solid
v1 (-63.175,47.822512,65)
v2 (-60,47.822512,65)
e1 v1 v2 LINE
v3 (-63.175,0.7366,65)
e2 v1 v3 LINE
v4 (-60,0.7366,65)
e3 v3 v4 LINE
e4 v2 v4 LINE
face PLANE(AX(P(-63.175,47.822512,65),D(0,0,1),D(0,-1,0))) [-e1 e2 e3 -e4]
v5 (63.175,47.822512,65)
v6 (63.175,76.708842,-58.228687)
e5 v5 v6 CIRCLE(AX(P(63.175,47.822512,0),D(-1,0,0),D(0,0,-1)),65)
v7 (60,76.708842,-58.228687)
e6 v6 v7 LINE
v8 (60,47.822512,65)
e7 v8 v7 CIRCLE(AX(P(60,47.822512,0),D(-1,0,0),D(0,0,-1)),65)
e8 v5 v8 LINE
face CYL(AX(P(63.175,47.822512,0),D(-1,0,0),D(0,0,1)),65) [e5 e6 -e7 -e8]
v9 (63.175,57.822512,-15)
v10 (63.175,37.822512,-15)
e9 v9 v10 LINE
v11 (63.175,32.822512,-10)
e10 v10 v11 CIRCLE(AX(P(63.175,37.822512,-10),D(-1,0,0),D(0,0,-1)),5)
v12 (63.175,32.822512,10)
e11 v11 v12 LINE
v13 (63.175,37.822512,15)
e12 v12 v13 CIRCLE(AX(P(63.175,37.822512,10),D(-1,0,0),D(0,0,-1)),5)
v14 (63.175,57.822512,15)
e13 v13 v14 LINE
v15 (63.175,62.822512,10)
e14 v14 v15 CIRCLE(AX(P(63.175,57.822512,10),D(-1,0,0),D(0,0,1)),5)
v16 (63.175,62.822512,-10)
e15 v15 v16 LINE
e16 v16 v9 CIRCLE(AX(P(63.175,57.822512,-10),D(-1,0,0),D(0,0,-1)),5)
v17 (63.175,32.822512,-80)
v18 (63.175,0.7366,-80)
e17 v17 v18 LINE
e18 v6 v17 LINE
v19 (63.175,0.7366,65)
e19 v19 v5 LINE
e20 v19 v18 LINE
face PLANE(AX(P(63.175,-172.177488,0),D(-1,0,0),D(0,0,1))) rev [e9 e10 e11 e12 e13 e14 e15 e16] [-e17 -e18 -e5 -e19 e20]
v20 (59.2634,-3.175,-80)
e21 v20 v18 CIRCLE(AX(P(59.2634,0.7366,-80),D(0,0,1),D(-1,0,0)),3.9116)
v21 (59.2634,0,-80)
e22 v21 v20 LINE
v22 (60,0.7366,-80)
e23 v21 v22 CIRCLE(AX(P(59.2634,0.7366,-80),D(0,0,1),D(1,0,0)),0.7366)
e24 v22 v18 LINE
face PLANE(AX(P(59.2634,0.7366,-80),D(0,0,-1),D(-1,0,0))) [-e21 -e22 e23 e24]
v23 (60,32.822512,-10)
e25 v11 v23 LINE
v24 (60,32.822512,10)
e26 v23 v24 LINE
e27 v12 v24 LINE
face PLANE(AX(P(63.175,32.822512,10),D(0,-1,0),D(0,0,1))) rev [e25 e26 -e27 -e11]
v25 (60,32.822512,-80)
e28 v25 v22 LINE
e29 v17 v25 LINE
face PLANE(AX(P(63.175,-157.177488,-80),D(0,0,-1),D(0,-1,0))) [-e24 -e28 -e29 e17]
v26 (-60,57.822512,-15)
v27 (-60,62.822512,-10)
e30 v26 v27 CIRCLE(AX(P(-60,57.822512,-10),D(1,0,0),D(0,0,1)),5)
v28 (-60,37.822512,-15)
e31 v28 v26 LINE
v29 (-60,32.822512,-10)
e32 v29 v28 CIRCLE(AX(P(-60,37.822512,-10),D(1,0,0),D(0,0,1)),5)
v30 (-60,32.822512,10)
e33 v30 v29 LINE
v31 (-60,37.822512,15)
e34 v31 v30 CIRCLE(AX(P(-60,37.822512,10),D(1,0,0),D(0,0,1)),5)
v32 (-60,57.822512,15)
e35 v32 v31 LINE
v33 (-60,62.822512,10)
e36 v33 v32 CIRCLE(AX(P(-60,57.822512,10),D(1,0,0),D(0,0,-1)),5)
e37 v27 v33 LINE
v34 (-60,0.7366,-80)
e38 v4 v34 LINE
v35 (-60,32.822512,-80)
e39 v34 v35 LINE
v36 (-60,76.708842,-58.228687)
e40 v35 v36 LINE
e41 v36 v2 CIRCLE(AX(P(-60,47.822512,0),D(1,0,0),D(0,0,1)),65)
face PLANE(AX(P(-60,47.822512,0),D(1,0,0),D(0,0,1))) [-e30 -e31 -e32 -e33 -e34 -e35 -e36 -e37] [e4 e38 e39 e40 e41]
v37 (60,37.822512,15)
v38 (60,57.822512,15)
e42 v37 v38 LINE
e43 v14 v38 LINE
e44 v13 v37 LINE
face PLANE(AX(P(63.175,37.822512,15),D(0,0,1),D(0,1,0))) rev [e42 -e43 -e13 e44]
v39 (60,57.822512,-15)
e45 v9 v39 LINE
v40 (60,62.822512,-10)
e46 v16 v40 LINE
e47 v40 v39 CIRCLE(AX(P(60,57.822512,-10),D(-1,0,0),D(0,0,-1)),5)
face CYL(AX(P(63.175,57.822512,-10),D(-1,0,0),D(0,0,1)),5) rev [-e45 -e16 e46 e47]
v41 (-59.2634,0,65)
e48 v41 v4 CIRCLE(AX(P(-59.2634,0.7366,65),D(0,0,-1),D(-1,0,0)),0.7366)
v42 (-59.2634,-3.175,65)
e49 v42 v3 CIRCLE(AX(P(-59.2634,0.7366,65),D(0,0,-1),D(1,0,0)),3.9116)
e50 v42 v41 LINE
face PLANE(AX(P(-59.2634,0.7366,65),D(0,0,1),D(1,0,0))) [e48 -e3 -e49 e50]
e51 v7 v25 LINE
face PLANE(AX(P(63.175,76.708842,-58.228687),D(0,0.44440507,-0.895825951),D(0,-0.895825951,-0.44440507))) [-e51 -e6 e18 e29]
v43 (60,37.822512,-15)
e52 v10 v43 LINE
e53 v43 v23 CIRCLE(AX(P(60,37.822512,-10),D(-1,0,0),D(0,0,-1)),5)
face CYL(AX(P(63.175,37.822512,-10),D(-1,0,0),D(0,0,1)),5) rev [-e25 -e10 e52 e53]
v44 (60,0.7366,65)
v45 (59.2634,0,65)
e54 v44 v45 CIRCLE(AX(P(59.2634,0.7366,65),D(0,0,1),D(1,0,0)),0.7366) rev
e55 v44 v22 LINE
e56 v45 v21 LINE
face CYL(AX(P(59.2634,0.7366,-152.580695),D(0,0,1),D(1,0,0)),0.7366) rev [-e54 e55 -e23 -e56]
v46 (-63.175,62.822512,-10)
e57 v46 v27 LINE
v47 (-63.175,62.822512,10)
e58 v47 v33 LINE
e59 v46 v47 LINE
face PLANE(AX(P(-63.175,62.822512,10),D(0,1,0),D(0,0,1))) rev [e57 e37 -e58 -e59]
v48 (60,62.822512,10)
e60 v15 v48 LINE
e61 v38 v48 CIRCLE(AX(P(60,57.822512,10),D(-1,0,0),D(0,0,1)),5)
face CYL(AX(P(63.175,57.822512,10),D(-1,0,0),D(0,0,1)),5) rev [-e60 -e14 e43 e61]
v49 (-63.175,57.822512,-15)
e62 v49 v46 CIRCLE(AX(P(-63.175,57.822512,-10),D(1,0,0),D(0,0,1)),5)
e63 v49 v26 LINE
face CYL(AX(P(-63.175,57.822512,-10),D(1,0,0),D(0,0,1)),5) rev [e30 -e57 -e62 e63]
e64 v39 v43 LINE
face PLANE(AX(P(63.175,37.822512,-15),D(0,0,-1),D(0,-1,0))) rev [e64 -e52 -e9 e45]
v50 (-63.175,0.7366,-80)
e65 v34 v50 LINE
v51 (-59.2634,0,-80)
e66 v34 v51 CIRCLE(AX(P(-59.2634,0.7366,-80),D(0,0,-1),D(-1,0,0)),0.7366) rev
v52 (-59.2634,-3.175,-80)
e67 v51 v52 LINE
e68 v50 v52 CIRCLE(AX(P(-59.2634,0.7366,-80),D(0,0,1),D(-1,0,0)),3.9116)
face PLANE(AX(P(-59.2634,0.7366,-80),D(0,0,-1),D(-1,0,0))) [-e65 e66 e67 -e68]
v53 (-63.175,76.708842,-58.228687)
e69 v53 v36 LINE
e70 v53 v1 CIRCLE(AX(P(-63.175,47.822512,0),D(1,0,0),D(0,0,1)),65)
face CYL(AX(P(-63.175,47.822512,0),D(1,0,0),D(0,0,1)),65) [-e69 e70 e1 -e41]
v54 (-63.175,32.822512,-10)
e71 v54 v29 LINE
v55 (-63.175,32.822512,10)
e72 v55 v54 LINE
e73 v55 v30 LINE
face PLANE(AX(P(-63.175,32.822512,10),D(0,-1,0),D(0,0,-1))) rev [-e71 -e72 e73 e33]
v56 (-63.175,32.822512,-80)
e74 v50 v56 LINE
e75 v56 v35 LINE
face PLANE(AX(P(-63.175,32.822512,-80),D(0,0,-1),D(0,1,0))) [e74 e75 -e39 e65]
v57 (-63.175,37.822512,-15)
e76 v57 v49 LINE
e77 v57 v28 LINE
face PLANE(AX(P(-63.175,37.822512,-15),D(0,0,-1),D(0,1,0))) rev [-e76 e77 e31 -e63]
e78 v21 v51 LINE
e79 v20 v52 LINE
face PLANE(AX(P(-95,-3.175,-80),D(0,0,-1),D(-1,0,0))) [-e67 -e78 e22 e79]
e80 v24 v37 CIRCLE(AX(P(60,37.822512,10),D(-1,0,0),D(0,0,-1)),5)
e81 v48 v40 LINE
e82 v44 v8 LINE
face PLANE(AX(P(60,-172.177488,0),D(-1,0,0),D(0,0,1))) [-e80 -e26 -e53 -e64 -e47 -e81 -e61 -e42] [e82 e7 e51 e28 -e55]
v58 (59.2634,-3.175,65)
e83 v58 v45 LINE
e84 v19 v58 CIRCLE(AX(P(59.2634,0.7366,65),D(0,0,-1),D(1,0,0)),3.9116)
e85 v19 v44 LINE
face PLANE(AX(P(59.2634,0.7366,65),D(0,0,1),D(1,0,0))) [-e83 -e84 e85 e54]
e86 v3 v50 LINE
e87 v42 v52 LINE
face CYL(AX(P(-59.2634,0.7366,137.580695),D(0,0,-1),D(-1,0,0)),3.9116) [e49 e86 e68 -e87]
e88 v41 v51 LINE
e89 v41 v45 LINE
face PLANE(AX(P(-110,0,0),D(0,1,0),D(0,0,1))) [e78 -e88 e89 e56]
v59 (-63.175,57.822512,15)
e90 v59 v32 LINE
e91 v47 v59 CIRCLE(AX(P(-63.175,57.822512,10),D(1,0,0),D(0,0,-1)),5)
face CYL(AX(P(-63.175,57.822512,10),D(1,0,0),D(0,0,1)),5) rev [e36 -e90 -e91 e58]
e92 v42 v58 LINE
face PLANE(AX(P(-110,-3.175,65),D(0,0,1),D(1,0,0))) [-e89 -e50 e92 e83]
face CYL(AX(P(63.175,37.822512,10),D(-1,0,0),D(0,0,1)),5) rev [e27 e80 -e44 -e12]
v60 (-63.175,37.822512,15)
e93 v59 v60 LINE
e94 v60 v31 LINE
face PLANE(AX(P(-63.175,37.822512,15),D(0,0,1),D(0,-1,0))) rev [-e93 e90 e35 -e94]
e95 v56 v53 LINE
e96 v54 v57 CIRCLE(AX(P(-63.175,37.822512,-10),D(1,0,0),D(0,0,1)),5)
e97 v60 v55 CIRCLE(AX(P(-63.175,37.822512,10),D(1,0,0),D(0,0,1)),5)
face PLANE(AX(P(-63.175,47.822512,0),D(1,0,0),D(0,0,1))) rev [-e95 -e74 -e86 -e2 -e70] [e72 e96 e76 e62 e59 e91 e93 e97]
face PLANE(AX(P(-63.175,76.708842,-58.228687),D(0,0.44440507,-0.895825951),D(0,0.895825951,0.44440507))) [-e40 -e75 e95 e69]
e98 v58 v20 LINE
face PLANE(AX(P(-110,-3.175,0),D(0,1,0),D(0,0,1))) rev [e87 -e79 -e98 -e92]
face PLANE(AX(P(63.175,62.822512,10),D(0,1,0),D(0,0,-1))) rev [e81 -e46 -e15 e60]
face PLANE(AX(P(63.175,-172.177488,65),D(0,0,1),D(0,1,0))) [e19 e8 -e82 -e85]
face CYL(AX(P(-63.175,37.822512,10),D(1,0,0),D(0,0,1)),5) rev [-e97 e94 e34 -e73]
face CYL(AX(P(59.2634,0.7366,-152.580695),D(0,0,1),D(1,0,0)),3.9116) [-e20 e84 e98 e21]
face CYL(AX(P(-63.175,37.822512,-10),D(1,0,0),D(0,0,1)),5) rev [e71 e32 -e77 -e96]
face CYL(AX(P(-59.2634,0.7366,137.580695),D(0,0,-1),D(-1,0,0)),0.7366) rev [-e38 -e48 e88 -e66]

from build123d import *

# Parameters (mm, degrees)
BASE_FLANGE2_DEPTH         = 3.175
SKETCHED_START             = -176
SKETCHED_BEND3_OUTLINE_W   = 3.175
SKETCHED_BEND3_OUTLINE_H   = 145
SKETCHED_BEND3_DEPTH       = 112.825
SKETCHED_START_2           = 63.175
SKETCHED_BEND3_2_OUTLINE_W = 3.175
SKETCHED_BEND3_2_OUTLINE_H = 145
SKETCHED_BEND3_2_DEPTH     = 112.825
SKETCHED_START_3           = -62.794557784
SKETCHED_BEND3_3_DEPTH     = 2.794557784
SKETCHED_START_4           = 60
SKETCHED_BEND3_4_DEPTH     = 2.794557784
SKETCHED_START_5           = -63.175
SKETCHED_BEND3_5_DEPTH     = 3.9116
SKETCHED_START_6           = 59.2634
SKETCHED_BEND3_6_DEPTH     = 3.9116
SKETCHED_START_7           = -81
SKETCHED_BEND3_7_DEPTH     = 147


with BuildPart() as part:
    # Base-Flange2: sheet metal written as solids
    # Sketch1 → Base-Flange2 (new body)
    with BuildSketch(Plane(origin=(0, 0, 0), x_dir=(1, 0, 0), z_dir=(0, 1, 0))):
        with BuildLine():
            Line((-95, 80), (95, 80))
            Line((95, 80), (138.886329547, 58.22868679))
            ThreePointArc((138.886329547, 58.22868679), (173.284534609, -14.834678268), (110, -65))
            Line((110, -65), (-110, -65))
            ThreePointArc((-110, -65), (-173.284534609, -14.834678268), (-138.886329547, 58.22868679))
            Line((-138.886329547, 58.22868679), (-95, 80))
        make_face()
        with BuildLine():
            Line((100, -15), (120, -15))
            ThreePointArc((120, -15), (123.535533906, -13.535533906), (125, -10))
            Line((125, -10), (125, 10))
            ThreePointArc((125, 10), (123.535533906, 13.535533906), (120, 15))
            Line((120, 15), (100, 15))
            ThreePointArc((100, 15), (96.464466094, 13.535533906), (95, 10))
            Line((95, 10), (95, -10))
            ThreePointArc((95, -10), (96.464466094, -13.535533906), (100, -15))
        make_face(mode=Mode.SUBTRACT)
        with BuildLine():
            Line((-100, -15), (-120, -15))
            ThreePointArc((-120, -15), (-123.535533906, -13.535533906), (-125, -10))
            Line((-125, -10), (-125, 10))
            ThreePointArc((-125, 10), (-123.535533906, 13.535533906), (-120, 15))
            Line((-120, 15), (-100, 15))
            ThreePointArc((-100, 15), (-96.464466094, 13.535533906), (-95, 10))
            Line((-95, 10), (-95, -10))
            ThreePointArc((-95, -10), (-96.464466094, -13.535533906), (-100, -15))
        make_face(mode=Mode.SUBTRACT)
    extrude(amount=-BASE_FLANGE2_DEPTH)

    # Sketched Bend3: read off the stored shape, not the designer's step
    # Sketched Bend3 outline → Sketched Bend3 (cut)
    with BuildSketch(Plane.YZ.offset(SKETCHED_START)):
        with Locations((-1.5875, -7.5)):
            Rectangle(SKETCHED_BEND3_OUTLINE_W, SKETCHED_BEND3_OUTLINE_H)
    extrude(amount=SKETCHED_BEND3_DEPTH, mode=Mode.SUBTRACT)

    # Sketched Bend3 2 outline → Sketched Bend3 2 (cut)
    with BuildSketch(Plane.YZ.offset(SKETCHED_START_2)):
        with Locations((-1.5875, -7.5)):
            Rectangle(SKETCHED_BEND3_2_OUTLINE_W, SKETCHED_BEND3_2_OUTLINE_H)
    extrude(amount=SKETCHED_BEND3_2_DEPTH, mode=Mode.SUBTRACT)

    # Sketched Bend3 3 outline → Sketched Bend3 3 (add)
    with BuildSketch(Plane.YZ.offset(SKETCHED_START_3)):
        with BuildLine():
            Line((47.822512257, 65), (0, 65))
            Line((0, 65), (0, -80))
            Line((0, -80), (32.822512257, -80))
            Line((32.822512257, -80), (76.708841804, -58.22868679))
            ThreePointArc((76.708841804, -58.22868679), (111.107046866, 14.834678268), (47.822512257, 65))
        make_face()
        with BuildLine():
            ThreePointArc((62.822512257, -10), (61.358046163, -13.535533906), (57.822512257, -15))
            Line((57.822512257, -15), (37.822512257, -15))
            ThreePointArc((37.822512257, -15), (34.286978351, -13.535533906), (32.822512257, -10))
            Line((32.822512257, -10), (32.822512257, 10))
            ThreePointArc((32.822512257, 10), (34.286978351, 13.535533906), (37.822512257, 15))
            Line((37.822512257, 15), (57.822512257, 15))
            ThreePointArc((57.822512257, 15), (61.358046163, 13.535533906), (62.822512257, 10))
            Line((62.822512257, 10), (62.822512257, -10))
        make_face(mode=Mode.SUBTRACT)
    extrude(amount=SKETCHED_BEND3_3_DEPTH)

    # Sketched Bend3 4 outline → Sketched Bend3 4 (add)
    with BuildSketch(Plane.YZ.offset(SKETCHED_START_4)):
        with BuildLine():
            Line((47.822512257, 65), (0, 65))
            Line((0, 65), (0, -80))
            Line((0, -80), (32.822512257, -80))
            Line((32.822512257, -80), (76.708841804, -58.22868679))
            ThreePointArc((76.708841804, -58.22868679), (111.107046866, 14.834678268), (47.822512257, 65))
        make_face()
        with BuildLine():
            ThreePointArc((62.822512257, -10), (61.358046163, -13.535533906), (57.822512257, -15))
            Line((57.822512257, -15), (37.822512257, -15))
            ThreePointArc((37.822512257, -15), (34.286978351, -13.535533906), (32.822512257, -10))
            Line((32.822512257, -10), (32.822512257, 10))
            ThreePointArc((32.822512257, 10), (34.286978351, 13.535533906), (37.822512257, 15))
            Line((37.822512257, 15), (57.822512257, 15))
            ThreePointArc((57.822512257, 15), (61.358046163, 13.535533906), (62.822512257, 10))
            Line((62.822512257, 10), (62.822512257, -10))
        make_face(mode=Mode.SUBTRACT)
    extrude(amount=SKETCHED_BEND3_4_DEPTH)

    # Sketched Bend3 5 outline → Sketched Bend3 5 (add)
    with BuildSketch(Plane.YZ.offset(SKETCHED_START_5)):
        with BuildLine():
            ThreePointArc((76.708841804, -58.22868679), (111.107046866, 14.834678268), (47.822512257, 65))
            Line((47.822512257, 65), (0, 65))
            Line((0, 65), (0, -80))
            Line((0, -80), (32.822512257, -80))
            Line((32.822512257, -80), (76.708841804, -58.22868679))
        make_face()
        with BuildLine():
            ThreePointArc((62.822512257, -10), (61.358046163, -13.535533906), (57.822512257, -15))
            Line((57.822512257, -15), (37.822512257, -15))
            ThreePointArc((37.822512257, -15), (34.286978351, -13.535533906), (32.822512257, -10))
            Line((32.822512257, -10), (32.822512257, 10))
            ThreePointArc((32.822512257, 10), (34.286978351, 13.535533906), (37.822512257, 15))
            Line((37.822512257, 15), (57.822512257, 15))
            ThreePointArc((57.822512257, 15), (61.358046163, 13.535533906), (62.822512257, 10))
            Line((62.822512257, 10), (62.822512257, -10))
        make_face(mode=Mode.SUBTRACT)
    extrude(amount=SKETCHED_BEND3_5_DEPTH)

    # Sketched Bend3 6 outline → Sketched Bend3 6 (add)
    with BuildSketch(Plane.YZ.offset(SKETCHED_START_6)):
        with BuildLine():
            ThreePointArc((76.708841804, -58.22868679), (111.107046866, 14.834678268), (47.822512257, 65))
            Line((47.822512257, 65), (0, 65))
            Line((0, 65), (0, -80))
            Line((0, -80), (32.822512257, -80))
            Line((32.822512257, -80), (76.708841804, -58.22868679))
        make_face()
        with BuildLine():
            ThreePointArc((62.822512257, -10), (61.358046163, -13.535533906), (57.822512257, -15))
            Line((57.822512257, -15), (37.822512257, -15))
            ThreePointArc((37.822512257, -15), (34.286978351, -13.535533906), (32.822512257, -10))
            Line((32.822512257, -10), (32.822512257, 10))
            ThreePointArc((32.822512257, 10), (34.286978351, 13.535533906), (37.822512257, 15))
            Line((37.822512257, 15), (57.822512257, 15))
            ThreePointArc((57.822512257, 15), (61.358046163, 13.535533906), (62.822512257, 10))
            Line((62.822512257, 10), (62.822512257, -10))
        make_face(mode=Mode.SUBTRACT)
    extrude(amount=SKETCHED_BEND3_6_DEPTH)

    # Sketched Bend3 7 outline → Sketched Bend3 7 (cut)
    with BuildSketch(Plane.XY.offset(SKETCHED_START_7)):
        with BuildLine():
            Line((-65, -3.175000031), (-59.2634, -3.175))
            ThreePointArc((-59.2634, -3.175), (-62.029318885, -2.029318885), (-63.175, 0.7366))
            Line((-63.175, 0.7366), (-63.175000008, 32.822512257))
            Line((-63.175000008, 32.822512257), (-65, 32.822512257))
            Line((-65, 32.822512257), (-65, -3.175000031))
        make_face()
        with BuildLine():
            ThreePointArc((63.175, 0.7366), (62.029318885, -2.029318885), (59.2634, -3.175))
            Line((59.2634, -3.175), (65, -3.175000031))
            Line((65, -3.175000031), (65, 32.822512257))
            Line((65, 32.822512257), (63.175, 32.822512257))
            Line((63.175, 32.822512257), (63.175, 0.7366))
        make_face()
        with BuildLine():
            Line((-59.2634, 0), (-59.2634, 114))
            Line((-59.2634, 114), (-60, 114))
            Line((-60, 114), (-60, 0.7366))
            ThreePointArc((-60, 0.7366), (-59.784254855, 0.215745145), (-59.2634, 0))
        make_face()
        with BuildLine():
            ThreePointArc((59.2634, 0), (59.784254855, 0.215745145), (60, 0.7366))
            Line((60, 0.7366), (60, 114))
            Line((60, 114), (59.2634, 114))
            Line((59.2634, 114), (59.2634, 0))
        make_face()
    extrude(amount=SKETCHED_BEND3_7_DEPTH, mode=Mode.SUBTRACT)


solid = part.part
